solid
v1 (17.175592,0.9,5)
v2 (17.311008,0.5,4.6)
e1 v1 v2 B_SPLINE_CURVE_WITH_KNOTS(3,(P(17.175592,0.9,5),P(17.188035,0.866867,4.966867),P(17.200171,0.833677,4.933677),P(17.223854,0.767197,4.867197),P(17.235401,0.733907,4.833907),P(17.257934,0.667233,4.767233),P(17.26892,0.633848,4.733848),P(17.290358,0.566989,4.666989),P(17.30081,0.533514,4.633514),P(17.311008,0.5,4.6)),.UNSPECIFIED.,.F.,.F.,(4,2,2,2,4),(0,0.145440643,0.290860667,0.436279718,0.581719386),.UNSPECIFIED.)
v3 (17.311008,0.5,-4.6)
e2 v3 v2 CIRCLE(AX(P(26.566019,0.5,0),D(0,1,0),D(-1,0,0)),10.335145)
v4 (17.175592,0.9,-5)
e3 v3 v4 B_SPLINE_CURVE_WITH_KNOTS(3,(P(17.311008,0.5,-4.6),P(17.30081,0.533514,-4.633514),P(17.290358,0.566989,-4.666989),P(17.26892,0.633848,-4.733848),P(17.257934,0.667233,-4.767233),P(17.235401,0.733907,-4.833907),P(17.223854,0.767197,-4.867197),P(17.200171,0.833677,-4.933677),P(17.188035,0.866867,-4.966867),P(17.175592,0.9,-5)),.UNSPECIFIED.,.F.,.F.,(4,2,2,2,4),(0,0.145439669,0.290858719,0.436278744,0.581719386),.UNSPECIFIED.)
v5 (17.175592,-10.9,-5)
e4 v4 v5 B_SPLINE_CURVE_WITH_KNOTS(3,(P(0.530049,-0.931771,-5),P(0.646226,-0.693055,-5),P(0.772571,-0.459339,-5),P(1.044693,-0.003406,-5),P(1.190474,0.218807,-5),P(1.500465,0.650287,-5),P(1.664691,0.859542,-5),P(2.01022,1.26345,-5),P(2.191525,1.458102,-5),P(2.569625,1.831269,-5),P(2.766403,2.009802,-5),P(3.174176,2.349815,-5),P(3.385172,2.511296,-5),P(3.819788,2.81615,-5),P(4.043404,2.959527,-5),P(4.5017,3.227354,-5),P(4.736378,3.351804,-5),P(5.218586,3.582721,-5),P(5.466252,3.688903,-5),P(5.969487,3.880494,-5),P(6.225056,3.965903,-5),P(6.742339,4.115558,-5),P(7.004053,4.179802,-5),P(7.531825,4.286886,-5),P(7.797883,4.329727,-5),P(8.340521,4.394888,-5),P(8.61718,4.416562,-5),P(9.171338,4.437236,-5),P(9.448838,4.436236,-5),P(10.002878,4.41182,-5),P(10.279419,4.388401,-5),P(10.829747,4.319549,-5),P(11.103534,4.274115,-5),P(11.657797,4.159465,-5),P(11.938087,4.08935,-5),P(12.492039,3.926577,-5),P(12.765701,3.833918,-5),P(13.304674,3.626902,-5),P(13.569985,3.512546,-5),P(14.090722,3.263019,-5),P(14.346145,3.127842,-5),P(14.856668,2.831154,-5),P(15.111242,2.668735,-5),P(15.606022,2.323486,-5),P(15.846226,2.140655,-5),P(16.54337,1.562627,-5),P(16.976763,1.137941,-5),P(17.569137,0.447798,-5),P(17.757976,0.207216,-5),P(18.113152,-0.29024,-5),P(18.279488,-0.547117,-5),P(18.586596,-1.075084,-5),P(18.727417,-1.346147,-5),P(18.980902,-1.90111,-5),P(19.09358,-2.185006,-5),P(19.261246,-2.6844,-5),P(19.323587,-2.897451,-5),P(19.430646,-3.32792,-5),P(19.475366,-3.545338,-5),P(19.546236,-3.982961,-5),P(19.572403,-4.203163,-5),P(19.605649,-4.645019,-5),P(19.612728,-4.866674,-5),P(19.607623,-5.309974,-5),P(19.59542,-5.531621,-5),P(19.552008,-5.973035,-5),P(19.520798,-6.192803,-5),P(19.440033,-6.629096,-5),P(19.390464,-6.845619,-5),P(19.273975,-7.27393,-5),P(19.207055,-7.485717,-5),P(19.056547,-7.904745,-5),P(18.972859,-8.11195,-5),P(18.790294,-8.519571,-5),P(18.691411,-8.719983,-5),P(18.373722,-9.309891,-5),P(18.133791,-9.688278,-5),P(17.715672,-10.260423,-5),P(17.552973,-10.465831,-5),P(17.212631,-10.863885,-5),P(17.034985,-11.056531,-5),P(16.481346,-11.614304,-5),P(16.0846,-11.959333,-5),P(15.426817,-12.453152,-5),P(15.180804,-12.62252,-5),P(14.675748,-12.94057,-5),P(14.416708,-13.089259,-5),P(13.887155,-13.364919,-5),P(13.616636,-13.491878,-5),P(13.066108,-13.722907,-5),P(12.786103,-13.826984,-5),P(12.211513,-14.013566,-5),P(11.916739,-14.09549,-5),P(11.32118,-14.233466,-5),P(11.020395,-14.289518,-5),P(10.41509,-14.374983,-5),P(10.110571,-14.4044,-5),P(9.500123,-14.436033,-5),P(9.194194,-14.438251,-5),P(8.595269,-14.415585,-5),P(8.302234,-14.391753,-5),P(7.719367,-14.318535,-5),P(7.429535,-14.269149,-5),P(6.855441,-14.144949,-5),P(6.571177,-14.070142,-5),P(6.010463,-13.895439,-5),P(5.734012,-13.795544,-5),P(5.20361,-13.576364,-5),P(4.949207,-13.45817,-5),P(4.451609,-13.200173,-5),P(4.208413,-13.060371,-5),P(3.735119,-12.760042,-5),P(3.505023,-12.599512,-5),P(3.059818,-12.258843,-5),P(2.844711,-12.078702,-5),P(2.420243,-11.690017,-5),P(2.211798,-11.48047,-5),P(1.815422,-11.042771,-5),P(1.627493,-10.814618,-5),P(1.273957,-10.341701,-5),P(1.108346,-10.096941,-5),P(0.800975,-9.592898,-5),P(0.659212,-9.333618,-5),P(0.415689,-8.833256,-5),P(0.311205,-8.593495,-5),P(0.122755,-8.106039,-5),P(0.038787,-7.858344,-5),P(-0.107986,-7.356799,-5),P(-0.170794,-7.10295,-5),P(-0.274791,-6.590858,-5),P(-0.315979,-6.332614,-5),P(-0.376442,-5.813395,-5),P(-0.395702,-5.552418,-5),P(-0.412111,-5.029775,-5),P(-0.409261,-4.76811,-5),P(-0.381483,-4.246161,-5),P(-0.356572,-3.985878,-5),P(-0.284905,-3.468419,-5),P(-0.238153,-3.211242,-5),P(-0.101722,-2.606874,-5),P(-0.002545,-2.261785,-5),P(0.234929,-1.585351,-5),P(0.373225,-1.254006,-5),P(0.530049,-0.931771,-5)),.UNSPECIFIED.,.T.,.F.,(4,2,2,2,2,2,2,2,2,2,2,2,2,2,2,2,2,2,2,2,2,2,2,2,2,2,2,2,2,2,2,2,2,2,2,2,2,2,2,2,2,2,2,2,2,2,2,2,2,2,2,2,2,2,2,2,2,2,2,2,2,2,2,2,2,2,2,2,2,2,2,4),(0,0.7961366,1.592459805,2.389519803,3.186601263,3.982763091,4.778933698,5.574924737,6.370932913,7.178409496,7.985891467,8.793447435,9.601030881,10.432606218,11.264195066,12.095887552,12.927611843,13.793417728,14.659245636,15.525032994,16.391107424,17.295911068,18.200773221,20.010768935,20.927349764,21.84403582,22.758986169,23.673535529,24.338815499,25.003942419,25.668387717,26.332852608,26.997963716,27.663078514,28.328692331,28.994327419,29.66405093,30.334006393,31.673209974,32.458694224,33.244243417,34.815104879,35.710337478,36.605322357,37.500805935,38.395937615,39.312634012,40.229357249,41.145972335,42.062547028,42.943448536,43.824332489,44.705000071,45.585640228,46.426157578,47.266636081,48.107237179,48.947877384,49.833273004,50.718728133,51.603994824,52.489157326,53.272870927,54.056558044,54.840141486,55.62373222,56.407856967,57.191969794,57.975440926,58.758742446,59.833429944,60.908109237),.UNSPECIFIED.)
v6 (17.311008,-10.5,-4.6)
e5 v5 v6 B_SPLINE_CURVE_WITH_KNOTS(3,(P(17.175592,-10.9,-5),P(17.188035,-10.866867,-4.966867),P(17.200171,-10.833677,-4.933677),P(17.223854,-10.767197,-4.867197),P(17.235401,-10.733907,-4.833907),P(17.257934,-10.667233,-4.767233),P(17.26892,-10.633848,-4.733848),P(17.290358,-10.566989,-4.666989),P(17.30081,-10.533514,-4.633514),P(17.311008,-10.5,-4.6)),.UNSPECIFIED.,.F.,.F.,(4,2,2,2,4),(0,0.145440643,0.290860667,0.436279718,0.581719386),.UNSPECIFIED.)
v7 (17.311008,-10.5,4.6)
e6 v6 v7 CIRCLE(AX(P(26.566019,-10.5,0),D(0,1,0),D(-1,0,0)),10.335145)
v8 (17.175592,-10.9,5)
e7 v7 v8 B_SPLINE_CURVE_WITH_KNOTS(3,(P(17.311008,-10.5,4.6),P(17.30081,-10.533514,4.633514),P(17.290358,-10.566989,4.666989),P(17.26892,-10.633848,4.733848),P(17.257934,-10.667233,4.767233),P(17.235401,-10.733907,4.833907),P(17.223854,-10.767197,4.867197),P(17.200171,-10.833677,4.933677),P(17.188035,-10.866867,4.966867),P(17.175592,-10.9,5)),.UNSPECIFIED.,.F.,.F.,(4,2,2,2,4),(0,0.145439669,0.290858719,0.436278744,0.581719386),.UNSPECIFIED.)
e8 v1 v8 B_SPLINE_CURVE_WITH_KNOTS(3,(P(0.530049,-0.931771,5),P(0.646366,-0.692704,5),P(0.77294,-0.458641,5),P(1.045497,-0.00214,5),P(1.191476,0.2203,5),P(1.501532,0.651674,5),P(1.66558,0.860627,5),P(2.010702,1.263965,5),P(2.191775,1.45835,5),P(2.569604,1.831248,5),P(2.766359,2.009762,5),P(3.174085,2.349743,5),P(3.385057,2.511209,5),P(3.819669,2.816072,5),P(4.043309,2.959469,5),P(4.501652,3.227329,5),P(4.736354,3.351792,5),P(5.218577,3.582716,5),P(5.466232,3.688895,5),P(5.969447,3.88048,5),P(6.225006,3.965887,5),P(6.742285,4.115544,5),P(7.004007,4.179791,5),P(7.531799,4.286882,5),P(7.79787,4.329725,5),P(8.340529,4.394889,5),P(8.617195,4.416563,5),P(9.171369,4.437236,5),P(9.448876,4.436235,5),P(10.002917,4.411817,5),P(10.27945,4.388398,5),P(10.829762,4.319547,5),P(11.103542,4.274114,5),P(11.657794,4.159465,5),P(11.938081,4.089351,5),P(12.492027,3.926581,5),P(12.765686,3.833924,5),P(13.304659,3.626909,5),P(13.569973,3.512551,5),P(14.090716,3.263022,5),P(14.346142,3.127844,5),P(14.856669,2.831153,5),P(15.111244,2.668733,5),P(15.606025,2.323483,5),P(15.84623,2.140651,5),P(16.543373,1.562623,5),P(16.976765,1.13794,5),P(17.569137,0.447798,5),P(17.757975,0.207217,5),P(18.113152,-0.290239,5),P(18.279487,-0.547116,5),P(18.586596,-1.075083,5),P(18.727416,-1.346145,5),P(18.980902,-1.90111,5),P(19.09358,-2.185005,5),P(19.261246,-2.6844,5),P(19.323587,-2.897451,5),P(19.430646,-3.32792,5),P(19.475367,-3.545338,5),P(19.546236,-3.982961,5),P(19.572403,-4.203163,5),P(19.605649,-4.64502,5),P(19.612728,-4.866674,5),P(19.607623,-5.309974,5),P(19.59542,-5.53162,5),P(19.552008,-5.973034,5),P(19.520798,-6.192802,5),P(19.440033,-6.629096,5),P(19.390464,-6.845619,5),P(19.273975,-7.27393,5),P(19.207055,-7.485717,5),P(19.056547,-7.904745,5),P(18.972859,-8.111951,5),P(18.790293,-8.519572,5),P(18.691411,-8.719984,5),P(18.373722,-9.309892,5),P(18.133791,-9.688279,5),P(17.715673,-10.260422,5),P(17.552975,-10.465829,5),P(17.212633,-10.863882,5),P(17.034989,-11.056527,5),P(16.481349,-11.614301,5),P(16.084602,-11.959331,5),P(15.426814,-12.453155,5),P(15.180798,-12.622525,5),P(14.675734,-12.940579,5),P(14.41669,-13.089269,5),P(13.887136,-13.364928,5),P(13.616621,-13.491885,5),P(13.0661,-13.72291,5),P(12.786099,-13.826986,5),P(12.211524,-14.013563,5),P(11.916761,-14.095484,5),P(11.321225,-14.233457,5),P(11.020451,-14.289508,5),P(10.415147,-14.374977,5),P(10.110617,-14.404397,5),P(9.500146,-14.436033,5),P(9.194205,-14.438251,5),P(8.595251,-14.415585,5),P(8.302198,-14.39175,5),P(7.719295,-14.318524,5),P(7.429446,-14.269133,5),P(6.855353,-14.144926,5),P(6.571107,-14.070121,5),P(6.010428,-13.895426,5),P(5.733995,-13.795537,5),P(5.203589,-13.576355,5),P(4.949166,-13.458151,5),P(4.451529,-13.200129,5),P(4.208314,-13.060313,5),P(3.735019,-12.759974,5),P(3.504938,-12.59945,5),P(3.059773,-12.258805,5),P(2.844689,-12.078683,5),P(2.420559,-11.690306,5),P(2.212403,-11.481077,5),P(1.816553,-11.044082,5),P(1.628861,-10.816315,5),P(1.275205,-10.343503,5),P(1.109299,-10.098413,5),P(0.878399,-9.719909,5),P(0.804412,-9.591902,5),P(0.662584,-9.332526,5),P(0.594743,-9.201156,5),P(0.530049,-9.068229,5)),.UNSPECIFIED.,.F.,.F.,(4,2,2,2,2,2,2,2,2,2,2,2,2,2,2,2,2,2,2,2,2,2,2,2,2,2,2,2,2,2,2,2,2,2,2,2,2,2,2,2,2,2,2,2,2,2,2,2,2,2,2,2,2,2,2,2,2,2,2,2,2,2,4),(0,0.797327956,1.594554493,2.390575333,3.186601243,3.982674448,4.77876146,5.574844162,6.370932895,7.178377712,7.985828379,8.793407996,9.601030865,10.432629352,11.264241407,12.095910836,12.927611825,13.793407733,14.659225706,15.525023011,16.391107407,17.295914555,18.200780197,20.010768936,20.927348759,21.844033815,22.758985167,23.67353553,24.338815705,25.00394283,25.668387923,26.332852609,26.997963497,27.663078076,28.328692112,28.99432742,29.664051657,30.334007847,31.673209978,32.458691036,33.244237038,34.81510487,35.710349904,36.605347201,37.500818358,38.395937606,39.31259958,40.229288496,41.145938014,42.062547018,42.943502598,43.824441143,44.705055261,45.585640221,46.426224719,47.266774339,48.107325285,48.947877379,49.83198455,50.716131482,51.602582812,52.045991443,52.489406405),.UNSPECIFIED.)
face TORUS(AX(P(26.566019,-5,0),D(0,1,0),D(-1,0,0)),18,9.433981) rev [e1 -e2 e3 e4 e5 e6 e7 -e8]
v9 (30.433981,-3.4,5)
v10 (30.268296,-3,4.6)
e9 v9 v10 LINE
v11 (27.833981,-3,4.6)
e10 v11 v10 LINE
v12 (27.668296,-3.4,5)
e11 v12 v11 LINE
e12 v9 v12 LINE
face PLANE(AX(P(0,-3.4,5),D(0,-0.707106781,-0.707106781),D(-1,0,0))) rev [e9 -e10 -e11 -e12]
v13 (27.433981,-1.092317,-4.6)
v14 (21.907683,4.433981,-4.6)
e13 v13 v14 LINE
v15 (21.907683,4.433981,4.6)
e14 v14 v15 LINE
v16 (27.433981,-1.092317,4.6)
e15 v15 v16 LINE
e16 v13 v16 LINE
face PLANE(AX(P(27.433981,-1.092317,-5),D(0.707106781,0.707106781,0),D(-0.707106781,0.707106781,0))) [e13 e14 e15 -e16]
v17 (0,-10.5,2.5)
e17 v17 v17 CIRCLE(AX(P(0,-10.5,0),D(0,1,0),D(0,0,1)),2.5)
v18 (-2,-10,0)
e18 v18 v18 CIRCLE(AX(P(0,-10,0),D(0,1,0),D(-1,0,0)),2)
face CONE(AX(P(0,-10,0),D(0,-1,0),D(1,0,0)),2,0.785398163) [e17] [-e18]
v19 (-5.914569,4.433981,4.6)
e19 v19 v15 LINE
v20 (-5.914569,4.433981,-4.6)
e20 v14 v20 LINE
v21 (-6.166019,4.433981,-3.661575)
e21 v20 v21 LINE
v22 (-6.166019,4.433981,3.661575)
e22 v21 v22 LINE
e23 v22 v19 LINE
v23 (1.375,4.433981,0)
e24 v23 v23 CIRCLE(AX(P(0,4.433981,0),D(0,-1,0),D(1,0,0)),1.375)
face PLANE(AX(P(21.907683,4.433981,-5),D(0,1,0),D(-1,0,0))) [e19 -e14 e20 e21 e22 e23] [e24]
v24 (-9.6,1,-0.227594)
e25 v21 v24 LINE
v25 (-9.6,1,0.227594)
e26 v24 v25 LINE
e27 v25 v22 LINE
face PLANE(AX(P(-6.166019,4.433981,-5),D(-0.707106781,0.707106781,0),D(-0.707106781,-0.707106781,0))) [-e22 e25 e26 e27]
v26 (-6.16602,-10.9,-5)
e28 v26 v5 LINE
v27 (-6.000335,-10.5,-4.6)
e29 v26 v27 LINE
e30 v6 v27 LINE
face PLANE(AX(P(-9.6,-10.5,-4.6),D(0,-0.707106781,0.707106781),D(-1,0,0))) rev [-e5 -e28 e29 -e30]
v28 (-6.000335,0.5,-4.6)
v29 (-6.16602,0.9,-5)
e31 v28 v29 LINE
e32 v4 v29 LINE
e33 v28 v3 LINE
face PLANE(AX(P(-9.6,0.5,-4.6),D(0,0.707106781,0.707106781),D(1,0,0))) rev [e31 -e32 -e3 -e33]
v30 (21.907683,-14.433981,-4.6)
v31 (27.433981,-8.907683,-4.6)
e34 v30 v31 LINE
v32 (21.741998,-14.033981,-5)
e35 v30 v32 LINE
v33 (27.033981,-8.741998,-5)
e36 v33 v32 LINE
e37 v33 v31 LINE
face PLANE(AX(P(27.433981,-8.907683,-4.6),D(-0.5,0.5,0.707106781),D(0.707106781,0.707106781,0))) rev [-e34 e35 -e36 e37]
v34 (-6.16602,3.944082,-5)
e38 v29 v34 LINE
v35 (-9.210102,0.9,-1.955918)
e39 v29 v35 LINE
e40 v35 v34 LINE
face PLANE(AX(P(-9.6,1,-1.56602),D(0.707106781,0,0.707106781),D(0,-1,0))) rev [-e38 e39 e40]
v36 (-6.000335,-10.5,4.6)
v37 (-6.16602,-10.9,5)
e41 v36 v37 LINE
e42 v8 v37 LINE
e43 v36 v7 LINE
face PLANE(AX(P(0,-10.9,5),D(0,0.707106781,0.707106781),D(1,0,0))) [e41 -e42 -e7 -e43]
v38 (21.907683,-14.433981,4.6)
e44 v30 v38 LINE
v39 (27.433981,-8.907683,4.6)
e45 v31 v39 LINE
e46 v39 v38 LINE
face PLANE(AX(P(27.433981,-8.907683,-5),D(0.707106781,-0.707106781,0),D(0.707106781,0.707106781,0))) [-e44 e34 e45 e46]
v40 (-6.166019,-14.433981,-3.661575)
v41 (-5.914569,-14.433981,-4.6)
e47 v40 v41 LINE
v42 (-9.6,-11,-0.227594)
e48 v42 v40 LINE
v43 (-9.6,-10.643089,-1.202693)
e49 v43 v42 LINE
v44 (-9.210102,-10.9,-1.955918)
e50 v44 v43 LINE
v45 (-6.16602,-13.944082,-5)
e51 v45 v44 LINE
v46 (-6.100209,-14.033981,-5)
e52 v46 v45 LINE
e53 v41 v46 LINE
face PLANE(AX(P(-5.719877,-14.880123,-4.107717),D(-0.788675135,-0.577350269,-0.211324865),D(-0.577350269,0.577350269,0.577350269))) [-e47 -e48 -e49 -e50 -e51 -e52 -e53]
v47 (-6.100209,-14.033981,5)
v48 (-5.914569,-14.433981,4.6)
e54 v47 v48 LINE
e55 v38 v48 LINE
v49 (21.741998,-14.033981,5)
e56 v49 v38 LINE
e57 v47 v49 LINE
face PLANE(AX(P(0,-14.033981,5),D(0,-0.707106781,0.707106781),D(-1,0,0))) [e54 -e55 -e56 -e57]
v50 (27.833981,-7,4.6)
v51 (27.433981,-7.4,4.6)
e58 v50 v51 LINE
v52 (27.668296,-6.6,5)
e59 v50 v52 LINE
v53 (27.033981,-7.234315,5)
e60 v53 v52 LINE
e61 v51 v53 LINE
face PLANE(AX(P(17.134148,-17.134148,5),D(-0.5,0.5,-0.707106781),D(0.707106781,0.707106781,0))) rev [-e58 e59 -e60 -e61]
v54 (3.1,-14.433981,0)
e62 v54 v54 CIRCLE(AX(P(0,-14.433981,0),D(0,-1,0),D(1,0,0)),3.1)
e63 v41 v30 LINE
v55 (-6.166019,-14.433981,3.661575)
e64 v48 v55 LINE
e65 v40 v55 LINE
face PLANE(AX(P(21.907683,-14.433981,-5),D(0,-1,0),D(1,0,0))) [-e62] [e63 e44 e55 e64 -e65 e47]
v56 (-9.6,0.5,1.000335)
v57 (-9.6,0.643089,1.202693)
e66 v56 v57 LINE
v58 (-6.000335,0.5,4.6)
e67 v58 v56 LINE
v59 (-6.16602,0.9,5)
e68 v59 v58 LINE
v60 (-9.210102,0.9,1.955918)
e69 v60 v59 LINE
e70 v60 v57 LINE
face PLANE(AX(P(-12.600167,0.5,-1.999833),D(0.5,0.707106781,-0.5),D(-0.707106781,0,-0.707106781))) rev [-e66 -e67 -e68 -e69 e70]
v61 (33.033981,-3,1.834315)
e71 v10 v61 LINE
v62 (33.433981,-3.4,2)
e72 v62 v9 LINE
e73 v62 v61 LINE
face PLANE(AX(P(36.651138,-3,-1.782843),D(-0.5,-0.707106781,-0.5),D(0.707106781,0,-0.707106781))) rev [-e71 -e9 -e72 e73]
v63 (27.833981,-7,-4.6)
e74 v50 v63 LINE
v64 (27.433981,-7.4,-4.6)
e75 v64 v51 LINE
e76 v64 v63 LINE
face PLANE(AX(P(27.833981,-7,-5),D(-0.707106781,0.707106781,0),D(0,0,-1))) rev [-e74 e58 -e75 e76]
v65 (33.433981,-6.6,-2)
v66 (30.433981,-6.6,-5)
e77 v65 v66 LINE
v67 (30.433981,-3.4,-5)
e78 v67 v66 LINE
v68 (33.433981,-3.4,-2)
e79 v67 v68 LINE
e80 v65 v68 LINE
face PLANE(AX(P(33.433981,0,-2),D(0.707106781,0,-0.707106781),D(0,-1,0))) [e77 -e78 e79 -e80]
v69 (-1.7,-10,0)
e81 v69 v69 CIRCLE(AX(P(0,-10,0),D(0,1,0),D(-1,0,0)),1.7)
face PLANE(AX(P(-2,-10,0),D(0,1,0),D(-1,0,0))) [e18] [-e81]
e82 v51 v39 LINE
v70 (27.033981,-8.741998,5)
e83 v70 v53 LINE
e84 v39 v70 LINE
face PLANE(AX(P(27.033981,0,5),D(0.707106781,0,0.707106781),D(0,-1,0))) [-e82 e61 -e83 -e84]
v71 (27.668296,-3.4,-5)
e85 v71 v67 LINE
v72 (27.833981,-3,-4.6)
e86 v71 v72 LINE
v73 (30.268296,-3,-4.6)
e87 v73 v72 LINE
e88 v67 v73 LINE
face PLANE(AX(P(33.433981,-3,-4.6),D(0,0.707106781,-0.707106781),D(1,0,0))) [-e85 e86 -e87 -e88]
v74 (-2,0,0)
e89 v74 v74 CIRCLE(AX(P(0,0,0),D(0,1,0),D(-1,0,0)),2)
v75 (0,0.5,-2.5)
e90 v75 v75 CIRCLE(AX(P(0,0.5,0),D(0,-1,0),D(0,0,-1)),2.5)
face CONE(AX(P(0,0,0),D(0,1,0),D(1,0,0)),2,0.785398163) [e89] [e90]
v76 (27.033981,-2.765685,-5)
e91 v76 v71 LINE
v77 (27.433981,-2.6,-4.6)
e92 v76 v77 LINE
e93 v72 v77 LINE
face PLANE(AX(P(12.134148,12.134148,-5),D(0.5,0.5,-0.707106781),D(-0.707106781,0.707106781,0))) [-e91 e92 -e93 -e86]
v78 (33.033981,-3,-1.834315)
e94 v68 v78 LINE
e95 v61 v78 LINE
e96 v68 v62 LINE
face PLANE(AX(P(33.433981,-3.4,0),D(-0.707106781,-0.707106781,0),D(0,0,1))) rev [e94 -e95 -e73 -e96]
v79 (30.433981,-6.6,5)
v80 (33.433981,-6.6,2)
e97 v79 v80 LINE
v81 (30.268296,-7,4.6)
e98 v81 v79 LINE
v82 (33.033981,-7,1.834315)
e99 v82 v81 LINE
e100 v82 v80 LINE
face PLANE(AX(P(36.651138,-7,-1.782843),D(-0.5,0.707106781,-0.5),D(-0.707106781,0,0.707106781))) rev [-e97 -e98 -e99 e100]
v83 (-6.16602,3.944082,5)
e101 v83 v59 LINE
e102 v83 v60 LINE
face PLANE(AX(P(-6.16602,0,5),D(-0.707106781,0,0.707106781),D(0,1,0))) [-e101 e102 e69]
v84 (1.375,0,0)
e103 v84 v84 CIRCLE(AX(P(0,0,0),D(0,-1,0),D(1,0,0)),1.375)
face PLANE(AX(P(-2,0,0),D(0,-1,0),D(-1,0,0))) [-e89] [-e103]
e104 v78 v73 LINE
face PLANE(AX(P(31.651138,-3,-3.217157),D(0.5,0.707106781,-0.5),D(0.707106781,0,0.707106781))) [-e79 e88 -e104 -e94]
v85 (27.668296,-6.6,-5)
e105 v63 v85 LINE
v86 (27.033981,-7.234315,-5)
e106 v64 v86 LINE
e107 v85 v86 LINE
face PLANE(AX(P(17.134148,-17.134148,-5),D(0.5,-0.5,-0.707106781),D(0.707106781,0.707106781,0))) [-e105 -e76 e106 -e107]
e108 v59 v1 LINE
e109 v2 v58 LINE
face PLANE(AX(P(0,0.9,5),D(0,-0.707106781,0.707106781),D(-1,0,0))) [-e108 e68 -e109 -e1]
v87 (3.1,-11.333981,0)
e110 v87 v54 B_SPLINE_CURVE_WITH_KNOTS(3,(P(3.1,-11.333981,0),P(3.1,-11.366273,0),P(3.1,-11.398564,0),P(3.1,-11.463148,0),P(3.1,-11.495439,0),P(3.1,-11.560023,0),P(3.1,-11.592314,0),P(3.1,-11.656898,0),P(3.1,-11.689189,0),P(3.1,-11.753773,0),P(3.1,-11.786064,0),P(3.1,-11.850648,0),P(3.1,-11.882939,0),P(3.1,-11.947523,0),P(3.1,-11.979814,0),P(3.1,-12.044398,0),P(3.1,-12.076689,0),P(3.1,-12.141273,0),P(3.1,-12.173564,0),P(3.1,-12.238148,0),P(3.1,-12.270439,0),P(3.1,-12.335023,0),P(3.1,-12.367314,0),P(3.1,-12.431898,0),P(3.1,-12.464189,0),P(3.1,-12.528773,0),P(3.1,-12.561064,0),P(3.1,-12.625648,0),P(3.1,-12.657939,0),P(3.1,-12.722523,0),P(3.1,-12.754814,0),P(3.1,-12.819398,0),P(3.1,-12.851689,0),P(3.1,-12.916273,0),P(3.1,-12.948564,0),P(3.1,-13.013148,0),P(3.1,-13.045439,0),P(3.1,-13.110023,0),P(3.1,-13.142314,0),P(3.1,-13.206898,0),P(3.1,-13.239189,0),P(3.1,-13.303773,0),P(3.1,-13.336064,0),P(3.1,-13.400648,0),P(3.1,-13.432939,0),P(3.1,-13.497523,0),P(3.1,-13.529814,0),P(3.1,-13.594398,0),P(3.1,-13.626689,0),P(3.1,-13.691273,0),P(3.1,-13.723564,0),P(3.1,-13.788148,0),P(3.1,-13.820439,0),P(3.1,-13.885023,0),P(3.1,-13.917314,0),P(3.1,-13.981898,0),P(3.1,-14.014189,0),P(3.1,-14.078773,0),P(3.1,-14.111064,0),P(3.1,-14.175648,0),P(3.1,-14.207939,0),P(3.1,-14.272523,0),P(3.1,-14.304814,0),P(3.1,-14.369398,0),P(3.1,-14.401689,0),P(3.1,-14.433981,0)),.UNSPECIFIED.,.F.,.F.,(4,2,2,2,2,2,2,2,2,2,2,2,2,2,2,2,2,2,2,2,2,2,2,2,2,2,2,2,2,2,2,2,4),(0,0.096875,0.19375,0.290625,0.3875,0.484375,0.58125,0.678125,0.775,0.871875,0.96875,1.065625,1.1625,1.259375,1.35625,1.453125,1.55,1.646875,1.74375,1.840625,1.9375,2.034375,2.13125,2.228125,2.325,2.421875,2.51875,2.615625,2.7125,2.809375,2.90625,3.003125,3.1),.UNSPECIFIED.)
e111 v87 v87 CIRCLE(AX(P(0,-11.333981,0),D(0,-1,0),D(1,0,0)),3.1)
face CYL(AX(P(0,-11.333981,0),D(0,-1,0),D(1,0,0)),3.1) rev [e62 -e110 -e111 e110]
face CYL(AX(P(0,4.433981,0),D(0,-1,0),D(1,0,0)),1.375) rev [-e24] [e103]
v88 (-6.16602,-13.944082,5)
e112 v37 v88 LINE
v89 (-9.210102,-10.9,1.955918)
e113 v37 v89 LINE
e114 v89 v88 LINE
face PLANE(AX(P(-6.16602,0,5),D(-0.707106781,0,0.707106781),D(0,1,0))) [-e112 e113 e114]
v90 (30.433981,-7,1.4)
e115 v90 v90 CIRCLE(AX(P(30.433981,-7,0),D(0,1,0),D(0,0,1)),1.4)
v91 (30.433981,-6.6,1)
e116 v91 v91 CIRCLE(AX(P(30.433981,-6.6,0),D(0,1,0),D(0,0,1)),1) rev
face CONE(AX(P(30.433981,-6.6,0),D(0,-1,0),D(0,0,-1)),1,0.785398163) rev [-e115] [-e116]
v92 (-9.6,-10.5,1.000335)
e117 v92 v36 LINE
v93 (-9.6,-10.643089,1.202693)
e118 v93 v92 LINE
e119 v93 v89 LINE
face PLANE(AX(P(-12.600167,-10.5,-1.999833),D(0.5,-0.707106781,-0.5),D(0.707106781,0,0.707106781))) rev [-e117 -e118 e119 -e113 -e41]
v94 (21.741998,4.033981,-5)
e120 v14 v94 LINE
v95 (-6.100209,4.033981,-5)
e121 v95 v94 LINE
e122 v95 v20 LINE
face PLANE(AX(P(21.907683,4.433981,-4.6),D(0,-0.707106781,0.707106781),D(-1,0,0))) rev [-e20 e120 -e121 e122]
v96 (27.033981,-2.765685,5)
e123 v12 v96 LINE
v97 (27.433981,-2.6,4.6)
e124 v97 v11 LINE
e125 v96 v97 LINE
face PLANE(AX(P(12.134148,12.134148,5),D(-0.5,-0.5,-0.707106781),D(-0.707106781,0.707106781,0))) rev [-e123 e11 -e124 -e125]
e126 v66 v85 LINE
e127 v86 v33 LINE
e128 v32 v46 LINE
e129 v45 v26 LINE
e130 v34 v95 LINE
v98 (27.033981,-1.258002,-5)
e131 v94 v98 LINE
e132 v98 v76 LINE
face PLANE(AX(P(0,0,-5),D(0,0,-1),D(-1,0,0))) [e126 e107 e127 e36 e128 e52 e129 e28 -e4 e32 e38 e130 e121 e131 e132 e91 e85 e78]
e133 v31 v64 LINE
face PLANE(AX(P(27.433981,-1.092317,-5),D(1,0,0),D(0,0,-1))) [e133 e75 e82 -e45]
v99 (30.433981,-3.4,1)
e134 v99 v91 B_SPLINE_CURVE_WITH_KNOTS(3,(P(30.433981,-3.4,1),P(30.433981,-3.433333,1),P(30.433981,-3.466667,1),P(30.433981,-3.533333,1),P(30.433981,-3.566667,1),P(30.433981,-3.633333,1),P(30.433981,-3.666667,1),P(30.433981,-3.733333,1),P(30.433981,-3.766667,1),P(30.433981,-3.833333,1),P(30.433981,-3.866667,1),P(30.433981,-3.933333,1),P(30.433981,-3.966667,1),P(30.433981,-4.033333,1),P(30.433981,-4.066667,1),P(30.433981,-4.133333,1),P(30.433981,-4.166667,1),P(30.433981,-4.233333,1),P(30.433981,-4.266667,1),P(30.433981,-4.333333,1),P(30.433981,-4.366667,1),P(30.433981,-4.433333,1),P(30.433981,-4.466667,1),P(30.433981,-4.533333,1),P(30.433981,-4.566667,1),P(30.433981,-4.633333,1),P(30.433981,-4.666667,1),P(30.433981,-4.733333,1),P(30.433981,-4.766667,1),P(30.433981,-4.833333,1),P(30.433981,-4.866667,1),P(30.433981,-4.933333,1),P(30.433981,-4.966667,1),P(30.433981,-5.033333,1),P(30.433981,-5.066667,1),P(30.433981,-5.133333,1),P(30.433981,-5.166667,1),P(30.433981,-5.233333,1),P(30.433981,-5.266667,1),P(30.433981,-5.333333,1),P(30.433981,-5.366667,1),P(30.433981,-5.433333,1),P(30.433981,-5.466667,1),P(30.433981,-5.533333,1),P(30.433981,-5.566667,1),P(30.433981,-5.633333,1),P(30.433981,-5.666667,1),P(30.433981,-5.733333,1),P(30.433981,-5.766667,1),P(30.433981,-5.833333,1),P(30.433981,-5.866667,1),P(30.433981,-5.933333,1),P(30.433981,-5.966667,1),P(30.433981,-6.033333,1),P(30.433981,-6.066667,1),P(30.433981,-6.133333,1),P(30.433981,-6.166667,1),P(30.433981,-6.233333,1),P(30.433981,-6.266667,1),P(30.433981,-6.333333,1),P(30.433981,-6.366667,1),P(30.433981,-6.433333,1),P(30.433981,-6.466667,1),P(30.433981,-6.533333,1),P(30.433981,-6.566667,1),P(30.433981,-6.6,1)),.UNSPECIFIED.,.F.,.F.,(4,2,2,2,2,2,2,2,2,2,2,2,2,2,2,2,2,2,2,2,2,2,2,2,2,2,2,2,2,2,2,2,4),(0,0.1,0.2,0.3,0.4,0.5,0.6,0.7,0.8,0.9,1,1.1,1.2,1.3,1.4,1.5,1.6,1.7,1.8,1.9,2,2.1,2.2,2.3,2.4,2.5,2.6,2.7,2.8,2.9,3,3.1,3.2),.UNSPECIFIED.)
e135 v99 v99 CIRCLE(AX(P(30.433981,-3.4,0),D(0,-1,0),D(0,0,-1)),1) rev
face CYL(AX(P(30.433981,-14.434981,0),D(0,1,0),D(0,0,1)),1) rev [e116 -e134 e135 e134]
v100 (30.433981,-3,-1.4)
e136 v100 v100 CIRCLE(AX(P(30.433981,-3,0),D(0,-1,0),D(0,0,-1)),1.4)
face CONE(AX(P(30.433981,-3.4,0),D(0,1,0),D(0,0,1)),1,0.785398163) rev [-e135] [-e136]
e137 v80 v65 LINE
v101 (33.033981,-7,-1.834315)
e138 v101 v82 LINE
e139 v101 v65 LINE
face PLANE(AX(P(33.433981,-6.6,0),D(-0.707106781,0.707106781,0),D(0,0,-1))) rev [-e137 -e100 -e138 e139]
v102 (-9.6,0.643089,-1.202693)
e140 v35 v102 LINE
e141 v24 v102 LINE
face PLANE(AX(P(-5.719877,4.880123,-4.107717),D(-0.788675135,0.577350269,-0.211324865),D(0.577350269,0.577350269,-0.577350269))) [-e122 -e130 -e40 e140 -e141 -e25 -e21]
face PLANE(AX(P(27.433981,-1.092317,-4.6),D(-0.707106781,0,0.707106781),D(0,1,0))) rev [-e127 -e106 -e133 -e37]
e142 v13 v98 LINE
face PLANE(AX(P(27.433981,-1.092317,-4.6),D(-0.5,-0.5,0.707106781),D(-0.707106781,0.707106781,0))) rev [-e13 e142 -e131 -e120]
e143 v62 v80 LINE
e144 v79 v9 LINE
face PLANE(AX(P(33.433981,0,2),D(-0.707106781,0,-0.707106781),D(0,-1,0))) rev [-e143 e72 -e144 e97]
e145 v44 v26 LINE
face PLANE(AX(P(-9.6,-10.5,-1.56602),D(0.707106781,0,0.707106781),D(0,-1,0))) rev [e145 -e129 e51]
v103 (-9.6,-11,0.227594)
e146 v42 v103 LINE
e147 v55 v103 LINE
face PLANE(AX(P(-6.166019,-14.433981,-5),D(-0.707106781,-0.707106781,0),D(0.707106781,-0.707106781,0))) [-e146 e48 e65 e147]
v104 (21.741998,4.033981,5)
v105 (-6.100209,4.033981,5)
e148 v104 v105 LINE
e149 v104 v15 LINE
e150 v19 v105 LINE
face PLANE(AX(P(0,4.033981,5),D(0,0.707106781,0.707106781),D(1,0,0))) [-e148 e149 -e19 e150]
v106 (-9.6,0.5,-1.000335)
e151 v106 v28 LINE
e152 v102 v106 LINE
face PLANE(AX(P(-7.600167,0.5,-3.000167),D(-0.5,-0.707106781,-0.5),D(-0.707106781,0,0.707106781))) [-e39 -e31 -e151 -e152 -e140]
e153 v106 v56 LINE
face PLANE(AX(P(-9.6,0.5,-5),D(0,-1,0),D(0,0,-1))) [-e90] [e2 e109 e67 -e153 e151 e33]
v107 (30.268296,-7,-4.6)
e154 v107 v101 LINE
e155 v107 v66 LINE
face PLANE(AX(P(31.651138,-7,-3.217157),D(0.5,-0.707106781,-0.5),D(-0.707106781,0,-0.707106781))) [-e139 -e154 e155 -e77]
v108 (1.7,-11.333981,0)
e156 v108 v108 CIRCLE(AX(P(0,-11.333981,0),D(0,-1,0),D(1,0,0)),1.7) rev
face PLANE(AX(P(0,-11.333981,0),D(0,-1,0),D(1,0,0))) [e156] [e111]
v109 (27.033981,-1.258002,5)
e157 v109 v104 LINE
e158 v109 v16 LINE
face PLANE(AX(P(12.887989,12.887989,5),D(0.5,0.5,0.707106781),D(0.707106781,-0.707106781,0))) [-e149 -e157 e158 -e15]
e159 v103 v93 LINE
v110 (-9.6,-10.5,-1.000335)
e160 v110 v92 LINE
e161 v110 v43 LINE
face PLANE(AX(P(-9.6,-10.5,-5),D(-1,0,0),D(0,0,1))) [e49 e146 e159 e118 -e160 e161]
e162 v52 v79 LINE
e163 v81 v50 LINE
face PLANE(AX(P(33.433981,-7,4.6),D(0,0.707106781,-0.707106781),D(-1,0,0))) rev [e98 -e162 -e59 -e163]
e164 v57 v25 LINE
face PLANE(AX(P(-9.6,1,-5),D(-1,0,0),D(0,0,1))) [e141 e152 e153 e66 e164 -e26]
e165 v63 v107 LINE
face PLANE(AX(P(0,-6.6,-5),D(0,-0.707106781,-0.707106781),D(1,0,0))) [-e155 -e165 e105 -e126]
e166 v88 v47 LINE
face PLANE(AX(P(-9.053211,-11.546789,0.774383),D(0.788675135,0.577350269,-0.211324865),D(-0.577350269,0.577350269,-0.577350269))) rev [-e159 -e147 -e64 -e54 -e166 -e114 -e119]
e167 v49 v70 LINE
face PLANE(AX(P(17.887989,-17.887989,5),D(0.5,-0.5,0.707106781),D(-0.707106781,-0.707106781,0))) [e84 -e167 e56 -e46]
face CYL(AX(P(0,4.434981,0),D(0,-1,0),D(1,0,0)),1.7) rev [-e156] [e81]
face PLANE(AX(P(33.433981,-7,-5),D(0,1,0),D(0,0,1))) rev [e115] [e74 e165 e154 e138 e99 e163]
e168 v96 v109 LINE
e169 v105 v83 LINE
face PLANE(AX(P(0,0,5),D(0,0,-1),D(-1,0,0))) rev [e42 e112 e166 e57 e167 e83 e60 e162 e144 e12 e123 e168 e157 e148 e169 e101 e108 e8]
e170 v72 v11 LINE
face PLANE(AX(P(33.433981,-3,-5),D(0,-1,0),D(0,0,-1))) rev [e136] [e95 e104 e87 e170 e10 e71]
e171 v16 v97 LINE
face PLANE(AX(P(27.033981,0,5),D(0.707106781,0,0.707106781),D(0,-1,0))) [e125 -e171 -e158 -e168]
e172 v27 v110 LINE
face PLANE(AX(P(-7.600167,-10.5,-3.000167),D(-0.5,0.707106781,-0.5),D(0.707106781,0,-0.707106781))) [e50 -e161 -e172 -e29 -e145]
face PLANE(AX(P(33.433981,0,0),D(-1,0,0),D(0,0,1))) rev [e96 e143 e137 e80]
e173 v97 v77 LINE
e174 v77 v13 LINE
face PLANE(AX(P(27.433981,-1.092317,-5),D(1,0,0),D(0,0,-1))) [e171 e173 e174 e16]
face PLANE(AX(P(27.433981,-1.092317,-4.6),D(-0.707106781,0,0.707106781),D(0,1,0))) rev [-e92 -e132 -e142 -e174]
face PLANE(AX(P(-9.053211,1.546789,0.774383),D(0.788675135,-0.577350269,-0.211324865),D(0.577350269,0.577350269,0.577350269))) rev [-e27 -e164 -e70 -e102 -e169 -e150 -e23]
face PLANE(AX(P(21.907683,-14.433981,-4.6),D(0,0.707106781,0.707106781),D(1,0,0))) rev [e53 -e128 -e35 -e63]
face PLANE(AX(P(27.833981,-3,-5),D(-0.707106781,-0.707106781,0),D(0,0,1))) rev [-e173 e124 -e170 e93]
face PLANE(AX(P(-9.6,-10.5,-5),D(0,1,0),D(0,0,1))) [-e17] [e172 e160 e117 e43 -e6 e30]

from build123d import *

# Parameters (mm, degrees)
BOSS_EXTRUDE1_DEPTH      = 5
BOSS_EXTRUDE1_DEPTH_BACK = 5
CUT_EXTRUDE1_DEPTH       = 34.669323141
CUT_EXTRUDE1_DEPTH_BACK  = 34.669323141
SKETCH2_R                = 1.375
CUT_EXTRUDE2_REACH       = 35.669
SKETCH3_R                = 1.7
SKETCH4_R                = 3.1
CUT_EXTRUDE3_DEPTH       = 3.1
CHAMFER1_SIZE            = 3.43398
CUT_EXTRUDE4_START       = -5
CUT_EXTRUDE4_DEPTH       = 10
CHAMFER2_SIZE            = 0.4
CHAMFER3_SIZE            = 0.4
CHAMFER3_EDGE_2_SIZE     = 0.4
CHAMFER3_EDGE_2_SIZE2    = 1.092820323
CHAMFER3_EDGE_3_SIZE     = 0.4
CHAMFER3_EDGE_3_SIZE2    = 1.092820323
CHAMFER3_EDGE_4_SIZE     = 0.4
CHAMFER3_EDGE_5_SIZE     = 0.4
CHAMFER3_EDGE_6_SIZE     = 0.4
CHAMFER3_EDGE_7_SIZE     = 0.4
CHAMFER3_EDGE_7_SIZE2    = 1.092820323
CHAMFER3_EDGE_8_SIZE     = 0.4
CHAMFER3_EDGE_8_SIZE2    = 1.092820323
SKETCH9_W                = 10
SKETCH9_H                = 4
BOSS_EXTRUDE3_DEPTH      = 6
CUT_EXTRUDE5_REACH       = 37.687
SKETCH10_R               = 1
CHAMFER4_SIZE            = 0.4
CHAMFER5_SIZE            = 3
CHAMFER6_SIZE            = 0.4
MOVE_FACE1_OUTLINE_R     = 1.7
MOVE_FACE1_OUTLINE_R_2   = 1.375
MOVE_FACE1_DEPTH         = 0.5


# Read off the part's stored shape, not the designer's step: Move Face1
with BuildPart() as part:
    # Sketch1 → Boss-Extrude1 (new, two sides: drawn at the far end of the back side and taken through both)
    with BuildSketch(Plane.XY.offset(-BOSS_EXTRUDE1_DEPTH_BACK)):
        Polygon((27.433981132, -1.092317068), (21.907682932, 4.433981132), (-6.166018868, 4.433981132), (-9.6, 1), (-9.6, 0.5), (11.1, 0.5), (11.1, -10.5), (-9.6, -10.5), (-9.6, -11), (-6.166018868, -14.433981132), (21.907682932, -14.433981132), (27.433981132, -8.907682932), align=None)
    extrude(amount=BOSS_EXTRUDE1_DEPTH + BOSS_EXTRUDE1_DEPTH_BACK)

    # Sketch2 → Cut-Extrude1 (cut, two sides: drawn at the far end of the back side and taken through both)
    with BuildSketch(Plane.XZ.offset(14.433981132).offset(-CUT_EXTRUDE1_DEPTH_BACK)):
        Circle(SKETCH2_R)
    extrude(amount=CUT_EXTRUDE1_DEPTH + CUT_EXTRUDE1_DEPTH_BACK, mode=Mode.SUBTRACT)

    # Sketch3 → Cut-Extrude2 (cut, up to next)
    with BuildSketch(Plane.XZ.offset(14.433981132), mode=Mode.PRIVATE) as cut_extrude2_sk1:
        Circle(SKETCH3_R)
    cut_extrude2_tool1 = extrude(cut_extrude2_sk1.sketch, amount=-CUT_EXTRUDE2_REACH, mode=Mode.PRIVATE) & part.part
    add(cut_extrude2_tool1.solids().sort_by_distance((0, -14.433981, 0))[0], mode=Mode.SUBTRACT)

    # Sketch4 → Cut-Extrude3 (cut)
    with BuildSketch(Plane.XZ.offset(14.433981132)):
        Circle(SKETCH4_R)
    extrude(amount=-CUT_EXTRUDE3_DEPTH, mode=Mode.SUBTRACT)

    # Sketch5 → Revolve1 (revolve)
    with BuildSketch(Plane.XY, mode=Mode.PRIVATE) as revolve1_sk:
        Polygon((-1.7, -10.5), (-2.5, -10.5), (-2, -10), (-1.7, -10), align=None)
    revolve1 = revolve(revolve1_sk.sketch.rotate(Axis((0, 4.433981132, 0), (0, -1, 0)), 180), axis=Axis((0, 4.433981132, 0), (0, -1, 0)))

    # Mirror1: Revolve1 across plane
    add(revolve1.mirror(Plane(origin=(0, -5, 0), x_dir=(0, 0, 1), z_dir=(0, -1, 0))))

    # Chamfer1
    chamfer1_edges = [part.edges().sort_by_distance(p)[0] for p in [
        (-9.6, 0.75, 5),
        (-9.6, 0.75, -5),
        (-9.6, -10.75, -5),
        (-9.6, -10.75, 5),
    ]]
    chamfer(chamfer1_edges, length=CHAMFER1_SIZE)

    # Sketch7 → Cut-Extrude4 (cut)
    with BuildSketch(Plane.XY.offset(CUT_EXTRUDE4_START)):
        with BuildLine():
            Line((11.1, 0.5), (11.1, -10.5))
            Line((11.1, -10.5), (16.230873726, -10.5))
            ThreePointArc((16.230873726, -10.5), (18, -5), (16.230873726, 0.5))
            Line((16.230873726, 0.5), (11.1, 0.5))
        make_face()
    extrude(amount=CUT_EXTRUDE4_DEPTH, mode=Mode.SUBTRACT)

    # Sketch7<2> → Cut-Revolve3 (revolve, cut)
    with BuildSketch(Plane.XY):
        with BuildLine():
            Line((11.1, 0.5), (11.1, -10.5))
            Line((11.1, -10.5), (16.230873726, -10.5))
            ThreePointArc((16.230873726, -10.5), (18, -5), (16.230873726, 0.5))
            Line((16.230873726, 0.5), (11.1, 0.5))
        make_face()
    revolve(axis=Axis((26.566018868, 5.861349866, 0), (0, -1, 0)), mode=Mode.SUBTRACT)

    # Chamfer2
    chamfer2_edges = [part.edges().sort_by_distance(p)[0] for p in [
        (5.677410985, -10.5, -5),
        (7.870832032, -14.433981132, -5),
        (24.670832032, -11.670832032, -5),
        (5.677410985, -10.5, 5),
        (7.870832032, -14.433981132, 5),
        (24.670832032, -11.670832032, 5),
        (24.670832032, 1.670832032, 5),
        (24.670832032, 1.670832032, -5),
        (7.870832032, 4.433981132, 5),
        (7.870832032, 4.433981132, -5),
        (5.677410985, 0.5, 5),
        (5.677410985, 0.5, -5),
    ]]
    chamfer(chamfer2_edges, length=CHAMFER2_SIZE)

    # Chamfer3
    chamfer3_edges = [part.edges().sort_by_distance(p)[0] for p in [
        (-8.08301, 0.5, 3.08301),
    ]]
    chamfer(chamfer3_edges, length=CHAMFER3_SIZE)

    # Chamfer3 edge 2
    chamfer3_edge_2_edges = [part.edges().sort_by_distance(p)[0] for p in [
        (-7.983009717, 2.616990283, 3.183010283),
    ]]
    chamfer3_edge_2_side = [part.faces().sort_by_distance(p)[0] for p in [
        (-7.458377293, 1.830066089, 3.707642707),
    ]]
    chamfer(chamfer3_edge_2_edges, length=CHAMFER3_EDGE_2_SIZE, length2=CHAMFER3_EDGE_2_SIZE2, reference=chamfer3_edge_2_side[0])

    # Chamfer3 edge 3
    chamfer3_edge_3_edges = [part.edges().sort_by_distance(p)[0] for p in [
        (-7.983009717, 2.616990283, -3.183010283),
    ]]
    chamfer3_edge_3_side = [part.faces().sort_by_distance(p)[0] for p in [
        (-7.458377293, 1.830066089, -3.707642707),
    ]]
    chamfer(chamfer3_edge_3_edges, length=CHAMFER3_EDGE_3_SIZE, length2=CHAMFER3_EDGE_3_SIZE2, reference=chamfer3_edge_3_side[0])

    # Chamfer3 edge 4
    chamfer3_edge_4_edges = [part.edges().sort_by_distance(p)[0] for p in [
        (-8.08301, 0.5, -3.08301),
    ]]
    chamfer(chamfer3_edge_4_edges, length=CHAMFER3_EDGE_4_SIZE)

    # Chamfer3 edge 5
    chamfer3_edge_5_edges = [part.edges().sort_by_distance(p)[0] for p in [
        (-8.08301, -10.5, 3.08301),
    ]]
    chamfer(chamfer3_edge_5_edges, length=CHAMFER3_EDGE_5_SIZE)

    # Chamfer3 edge 6
    chamfer3_edge_6_edges = [part.edges().sort_by_distance(p)[0] for p in [
        (-8.08301, -10.5, -3.08301),
    ]]
    chamfer(chamfer3_edge_6_edges, length=CHAMFER3_EDGE_6_SIZE)

    # Chamfer3 edge 7
    chamfer3_edge_7_edges = [part.edges().sort_by_distance(p)[0] for p in [
        (-7.983009717, -12.616990283, 3.183010283),
    ]]
    chamfer3_edge_7_side = [part.faces().sort_by_distance(p)[0] for p in [
        (-7.458377293, -11.830066089, 3.707642707),
    ]]
    chamfer(chamfer3_edge_7_edges, length=CHAMFER3_EDGE_7_SIZE, length2=CHAMFER3_EDGE_7_SIZE2, reference=chamfer3_edge_7_side[0])

    # Chamfer3 edge 8
    chamfer3_edge_8_edges = [part.edges().sort_by_distance(p)[0] for p in [
        (-7.983009717, -12.616990283, -3.183010283),
    ]]
    chamfer3_edge_8_side = [part.faces().sort_by_distance(p)[0] for p in [
        (-7.458377293, -11.830066089, -3.707642707),
    ]]
    chamfer(chamfer3_edge_8_edges, length=CHAMFER3_EDGE_8_SIZE, length2=CHAMFER3_EDGE_8_SIZE2, reference=chamfer3_edge_8_side[0])

    # Sketch9 → Boss-Extrude3 (add)
    with BuildSketch(Plane(origin=(27.433981132, 0, 0), x_dir=(0, 0, -1), z_dir=(1, 0, 0))):
        with Locations((0, -5)):
            Rectangle(SKETCH9_W, SKETCH9_H)
    extrude(amount=BOSS_EXTRUDE3_DEPTH)

    # Sketch10 → Cut-Extrude5 (cut, up to next)
    with BuildSketch(Plane(origin=(0, -3, 0), x_dir=(1, 0, 0), z_dir=(0, 1, 0)), mode=Mode.PRIVATE) as cut_extrude5_sk1:
        with Locations(Location((30.433981132, 0, 0), (0, 0, 270))):
            Circle(SKETCH10_R)
    cut_extrude5_tool1 = extrude(cut_extrude5_sk1.sketch, amount=-CUT_EXTRUDE5_REACH, mode=Mode.PRIVATE) & part.part
    add(cut_extrude5_tool1.solids().sort_by_distance((30.433981, -3, 0))[0], mode=Mode.SUBTRACT)

    # Chamfer4
    chamfer4_edges = [part.edges().sort_by_distance(p)[0] for p in [
        (27.433981132, -3, 0),
        (27.433981132, -7, 0),
    ]]
    chamfer(chamfer4_edges, length=CHAMFER4_SIZE)

    # Chamfer5
    chamfer5_edges = [part.edges().sort_by_distance(p)[0] for p in [
        (33.433981132, -5, -5),
        (33.433981132, -5, 5),
    ]]
    chamfer(chamfer5_edges, length=CHAMFER5_SIZE)

    # Chamfer6
    chamfer6_edges = [part.edges().sort_by_distance(p)[0] for p in [
        (30.433981132, -3, -1),
        (30.433981132, -7, -1),
        (27.433981132, -7.870998754, 5),
        (27.633981132, -7.2, 5),
        (27.633981132, -7.2, -5),
        (29.133981132, -7, 5),
        (31.933981132, -7, 3.5),
        (33.433981132, -7, 0),
        (31.933981132, -7, -3.5),
        (27.433981132, -7.870998754, -5),
        (29.133981132, -7, -5),
        (27.433981132, -2.129001246, 5),
        (27.633981132, -2.8, -5),
        (27.633981132, -2.8, 5),
        (29.133981132, -3, 5),
        (31.933981132, -3, 3.5),
        (33.433981132, -3, 0),
        (31.933981132, -3, -3.5),
        (29.133981132, -3, -5),
        (27.433981132, -2.129001246, -5),
    ]]
    chamfer(chamfer6_edges, length=CHAMFER6_SIZE)

    # Move Face1 outline → Move Face1 (add)
    with BuildSketch(Plane(origin=(0, 0, 0), x_dir=(1, 0, 0), z_dir=(0, 1, 0))):
        Circle(MOVE_FACE1_OUTLINE_R)
        Circle(MOVE_FACE1_OUTLINE_R_2, mode=Mode.SUBTRACT)
    extrude(amount=MOVE_FACE1_DEPTH)


solid = part.part
